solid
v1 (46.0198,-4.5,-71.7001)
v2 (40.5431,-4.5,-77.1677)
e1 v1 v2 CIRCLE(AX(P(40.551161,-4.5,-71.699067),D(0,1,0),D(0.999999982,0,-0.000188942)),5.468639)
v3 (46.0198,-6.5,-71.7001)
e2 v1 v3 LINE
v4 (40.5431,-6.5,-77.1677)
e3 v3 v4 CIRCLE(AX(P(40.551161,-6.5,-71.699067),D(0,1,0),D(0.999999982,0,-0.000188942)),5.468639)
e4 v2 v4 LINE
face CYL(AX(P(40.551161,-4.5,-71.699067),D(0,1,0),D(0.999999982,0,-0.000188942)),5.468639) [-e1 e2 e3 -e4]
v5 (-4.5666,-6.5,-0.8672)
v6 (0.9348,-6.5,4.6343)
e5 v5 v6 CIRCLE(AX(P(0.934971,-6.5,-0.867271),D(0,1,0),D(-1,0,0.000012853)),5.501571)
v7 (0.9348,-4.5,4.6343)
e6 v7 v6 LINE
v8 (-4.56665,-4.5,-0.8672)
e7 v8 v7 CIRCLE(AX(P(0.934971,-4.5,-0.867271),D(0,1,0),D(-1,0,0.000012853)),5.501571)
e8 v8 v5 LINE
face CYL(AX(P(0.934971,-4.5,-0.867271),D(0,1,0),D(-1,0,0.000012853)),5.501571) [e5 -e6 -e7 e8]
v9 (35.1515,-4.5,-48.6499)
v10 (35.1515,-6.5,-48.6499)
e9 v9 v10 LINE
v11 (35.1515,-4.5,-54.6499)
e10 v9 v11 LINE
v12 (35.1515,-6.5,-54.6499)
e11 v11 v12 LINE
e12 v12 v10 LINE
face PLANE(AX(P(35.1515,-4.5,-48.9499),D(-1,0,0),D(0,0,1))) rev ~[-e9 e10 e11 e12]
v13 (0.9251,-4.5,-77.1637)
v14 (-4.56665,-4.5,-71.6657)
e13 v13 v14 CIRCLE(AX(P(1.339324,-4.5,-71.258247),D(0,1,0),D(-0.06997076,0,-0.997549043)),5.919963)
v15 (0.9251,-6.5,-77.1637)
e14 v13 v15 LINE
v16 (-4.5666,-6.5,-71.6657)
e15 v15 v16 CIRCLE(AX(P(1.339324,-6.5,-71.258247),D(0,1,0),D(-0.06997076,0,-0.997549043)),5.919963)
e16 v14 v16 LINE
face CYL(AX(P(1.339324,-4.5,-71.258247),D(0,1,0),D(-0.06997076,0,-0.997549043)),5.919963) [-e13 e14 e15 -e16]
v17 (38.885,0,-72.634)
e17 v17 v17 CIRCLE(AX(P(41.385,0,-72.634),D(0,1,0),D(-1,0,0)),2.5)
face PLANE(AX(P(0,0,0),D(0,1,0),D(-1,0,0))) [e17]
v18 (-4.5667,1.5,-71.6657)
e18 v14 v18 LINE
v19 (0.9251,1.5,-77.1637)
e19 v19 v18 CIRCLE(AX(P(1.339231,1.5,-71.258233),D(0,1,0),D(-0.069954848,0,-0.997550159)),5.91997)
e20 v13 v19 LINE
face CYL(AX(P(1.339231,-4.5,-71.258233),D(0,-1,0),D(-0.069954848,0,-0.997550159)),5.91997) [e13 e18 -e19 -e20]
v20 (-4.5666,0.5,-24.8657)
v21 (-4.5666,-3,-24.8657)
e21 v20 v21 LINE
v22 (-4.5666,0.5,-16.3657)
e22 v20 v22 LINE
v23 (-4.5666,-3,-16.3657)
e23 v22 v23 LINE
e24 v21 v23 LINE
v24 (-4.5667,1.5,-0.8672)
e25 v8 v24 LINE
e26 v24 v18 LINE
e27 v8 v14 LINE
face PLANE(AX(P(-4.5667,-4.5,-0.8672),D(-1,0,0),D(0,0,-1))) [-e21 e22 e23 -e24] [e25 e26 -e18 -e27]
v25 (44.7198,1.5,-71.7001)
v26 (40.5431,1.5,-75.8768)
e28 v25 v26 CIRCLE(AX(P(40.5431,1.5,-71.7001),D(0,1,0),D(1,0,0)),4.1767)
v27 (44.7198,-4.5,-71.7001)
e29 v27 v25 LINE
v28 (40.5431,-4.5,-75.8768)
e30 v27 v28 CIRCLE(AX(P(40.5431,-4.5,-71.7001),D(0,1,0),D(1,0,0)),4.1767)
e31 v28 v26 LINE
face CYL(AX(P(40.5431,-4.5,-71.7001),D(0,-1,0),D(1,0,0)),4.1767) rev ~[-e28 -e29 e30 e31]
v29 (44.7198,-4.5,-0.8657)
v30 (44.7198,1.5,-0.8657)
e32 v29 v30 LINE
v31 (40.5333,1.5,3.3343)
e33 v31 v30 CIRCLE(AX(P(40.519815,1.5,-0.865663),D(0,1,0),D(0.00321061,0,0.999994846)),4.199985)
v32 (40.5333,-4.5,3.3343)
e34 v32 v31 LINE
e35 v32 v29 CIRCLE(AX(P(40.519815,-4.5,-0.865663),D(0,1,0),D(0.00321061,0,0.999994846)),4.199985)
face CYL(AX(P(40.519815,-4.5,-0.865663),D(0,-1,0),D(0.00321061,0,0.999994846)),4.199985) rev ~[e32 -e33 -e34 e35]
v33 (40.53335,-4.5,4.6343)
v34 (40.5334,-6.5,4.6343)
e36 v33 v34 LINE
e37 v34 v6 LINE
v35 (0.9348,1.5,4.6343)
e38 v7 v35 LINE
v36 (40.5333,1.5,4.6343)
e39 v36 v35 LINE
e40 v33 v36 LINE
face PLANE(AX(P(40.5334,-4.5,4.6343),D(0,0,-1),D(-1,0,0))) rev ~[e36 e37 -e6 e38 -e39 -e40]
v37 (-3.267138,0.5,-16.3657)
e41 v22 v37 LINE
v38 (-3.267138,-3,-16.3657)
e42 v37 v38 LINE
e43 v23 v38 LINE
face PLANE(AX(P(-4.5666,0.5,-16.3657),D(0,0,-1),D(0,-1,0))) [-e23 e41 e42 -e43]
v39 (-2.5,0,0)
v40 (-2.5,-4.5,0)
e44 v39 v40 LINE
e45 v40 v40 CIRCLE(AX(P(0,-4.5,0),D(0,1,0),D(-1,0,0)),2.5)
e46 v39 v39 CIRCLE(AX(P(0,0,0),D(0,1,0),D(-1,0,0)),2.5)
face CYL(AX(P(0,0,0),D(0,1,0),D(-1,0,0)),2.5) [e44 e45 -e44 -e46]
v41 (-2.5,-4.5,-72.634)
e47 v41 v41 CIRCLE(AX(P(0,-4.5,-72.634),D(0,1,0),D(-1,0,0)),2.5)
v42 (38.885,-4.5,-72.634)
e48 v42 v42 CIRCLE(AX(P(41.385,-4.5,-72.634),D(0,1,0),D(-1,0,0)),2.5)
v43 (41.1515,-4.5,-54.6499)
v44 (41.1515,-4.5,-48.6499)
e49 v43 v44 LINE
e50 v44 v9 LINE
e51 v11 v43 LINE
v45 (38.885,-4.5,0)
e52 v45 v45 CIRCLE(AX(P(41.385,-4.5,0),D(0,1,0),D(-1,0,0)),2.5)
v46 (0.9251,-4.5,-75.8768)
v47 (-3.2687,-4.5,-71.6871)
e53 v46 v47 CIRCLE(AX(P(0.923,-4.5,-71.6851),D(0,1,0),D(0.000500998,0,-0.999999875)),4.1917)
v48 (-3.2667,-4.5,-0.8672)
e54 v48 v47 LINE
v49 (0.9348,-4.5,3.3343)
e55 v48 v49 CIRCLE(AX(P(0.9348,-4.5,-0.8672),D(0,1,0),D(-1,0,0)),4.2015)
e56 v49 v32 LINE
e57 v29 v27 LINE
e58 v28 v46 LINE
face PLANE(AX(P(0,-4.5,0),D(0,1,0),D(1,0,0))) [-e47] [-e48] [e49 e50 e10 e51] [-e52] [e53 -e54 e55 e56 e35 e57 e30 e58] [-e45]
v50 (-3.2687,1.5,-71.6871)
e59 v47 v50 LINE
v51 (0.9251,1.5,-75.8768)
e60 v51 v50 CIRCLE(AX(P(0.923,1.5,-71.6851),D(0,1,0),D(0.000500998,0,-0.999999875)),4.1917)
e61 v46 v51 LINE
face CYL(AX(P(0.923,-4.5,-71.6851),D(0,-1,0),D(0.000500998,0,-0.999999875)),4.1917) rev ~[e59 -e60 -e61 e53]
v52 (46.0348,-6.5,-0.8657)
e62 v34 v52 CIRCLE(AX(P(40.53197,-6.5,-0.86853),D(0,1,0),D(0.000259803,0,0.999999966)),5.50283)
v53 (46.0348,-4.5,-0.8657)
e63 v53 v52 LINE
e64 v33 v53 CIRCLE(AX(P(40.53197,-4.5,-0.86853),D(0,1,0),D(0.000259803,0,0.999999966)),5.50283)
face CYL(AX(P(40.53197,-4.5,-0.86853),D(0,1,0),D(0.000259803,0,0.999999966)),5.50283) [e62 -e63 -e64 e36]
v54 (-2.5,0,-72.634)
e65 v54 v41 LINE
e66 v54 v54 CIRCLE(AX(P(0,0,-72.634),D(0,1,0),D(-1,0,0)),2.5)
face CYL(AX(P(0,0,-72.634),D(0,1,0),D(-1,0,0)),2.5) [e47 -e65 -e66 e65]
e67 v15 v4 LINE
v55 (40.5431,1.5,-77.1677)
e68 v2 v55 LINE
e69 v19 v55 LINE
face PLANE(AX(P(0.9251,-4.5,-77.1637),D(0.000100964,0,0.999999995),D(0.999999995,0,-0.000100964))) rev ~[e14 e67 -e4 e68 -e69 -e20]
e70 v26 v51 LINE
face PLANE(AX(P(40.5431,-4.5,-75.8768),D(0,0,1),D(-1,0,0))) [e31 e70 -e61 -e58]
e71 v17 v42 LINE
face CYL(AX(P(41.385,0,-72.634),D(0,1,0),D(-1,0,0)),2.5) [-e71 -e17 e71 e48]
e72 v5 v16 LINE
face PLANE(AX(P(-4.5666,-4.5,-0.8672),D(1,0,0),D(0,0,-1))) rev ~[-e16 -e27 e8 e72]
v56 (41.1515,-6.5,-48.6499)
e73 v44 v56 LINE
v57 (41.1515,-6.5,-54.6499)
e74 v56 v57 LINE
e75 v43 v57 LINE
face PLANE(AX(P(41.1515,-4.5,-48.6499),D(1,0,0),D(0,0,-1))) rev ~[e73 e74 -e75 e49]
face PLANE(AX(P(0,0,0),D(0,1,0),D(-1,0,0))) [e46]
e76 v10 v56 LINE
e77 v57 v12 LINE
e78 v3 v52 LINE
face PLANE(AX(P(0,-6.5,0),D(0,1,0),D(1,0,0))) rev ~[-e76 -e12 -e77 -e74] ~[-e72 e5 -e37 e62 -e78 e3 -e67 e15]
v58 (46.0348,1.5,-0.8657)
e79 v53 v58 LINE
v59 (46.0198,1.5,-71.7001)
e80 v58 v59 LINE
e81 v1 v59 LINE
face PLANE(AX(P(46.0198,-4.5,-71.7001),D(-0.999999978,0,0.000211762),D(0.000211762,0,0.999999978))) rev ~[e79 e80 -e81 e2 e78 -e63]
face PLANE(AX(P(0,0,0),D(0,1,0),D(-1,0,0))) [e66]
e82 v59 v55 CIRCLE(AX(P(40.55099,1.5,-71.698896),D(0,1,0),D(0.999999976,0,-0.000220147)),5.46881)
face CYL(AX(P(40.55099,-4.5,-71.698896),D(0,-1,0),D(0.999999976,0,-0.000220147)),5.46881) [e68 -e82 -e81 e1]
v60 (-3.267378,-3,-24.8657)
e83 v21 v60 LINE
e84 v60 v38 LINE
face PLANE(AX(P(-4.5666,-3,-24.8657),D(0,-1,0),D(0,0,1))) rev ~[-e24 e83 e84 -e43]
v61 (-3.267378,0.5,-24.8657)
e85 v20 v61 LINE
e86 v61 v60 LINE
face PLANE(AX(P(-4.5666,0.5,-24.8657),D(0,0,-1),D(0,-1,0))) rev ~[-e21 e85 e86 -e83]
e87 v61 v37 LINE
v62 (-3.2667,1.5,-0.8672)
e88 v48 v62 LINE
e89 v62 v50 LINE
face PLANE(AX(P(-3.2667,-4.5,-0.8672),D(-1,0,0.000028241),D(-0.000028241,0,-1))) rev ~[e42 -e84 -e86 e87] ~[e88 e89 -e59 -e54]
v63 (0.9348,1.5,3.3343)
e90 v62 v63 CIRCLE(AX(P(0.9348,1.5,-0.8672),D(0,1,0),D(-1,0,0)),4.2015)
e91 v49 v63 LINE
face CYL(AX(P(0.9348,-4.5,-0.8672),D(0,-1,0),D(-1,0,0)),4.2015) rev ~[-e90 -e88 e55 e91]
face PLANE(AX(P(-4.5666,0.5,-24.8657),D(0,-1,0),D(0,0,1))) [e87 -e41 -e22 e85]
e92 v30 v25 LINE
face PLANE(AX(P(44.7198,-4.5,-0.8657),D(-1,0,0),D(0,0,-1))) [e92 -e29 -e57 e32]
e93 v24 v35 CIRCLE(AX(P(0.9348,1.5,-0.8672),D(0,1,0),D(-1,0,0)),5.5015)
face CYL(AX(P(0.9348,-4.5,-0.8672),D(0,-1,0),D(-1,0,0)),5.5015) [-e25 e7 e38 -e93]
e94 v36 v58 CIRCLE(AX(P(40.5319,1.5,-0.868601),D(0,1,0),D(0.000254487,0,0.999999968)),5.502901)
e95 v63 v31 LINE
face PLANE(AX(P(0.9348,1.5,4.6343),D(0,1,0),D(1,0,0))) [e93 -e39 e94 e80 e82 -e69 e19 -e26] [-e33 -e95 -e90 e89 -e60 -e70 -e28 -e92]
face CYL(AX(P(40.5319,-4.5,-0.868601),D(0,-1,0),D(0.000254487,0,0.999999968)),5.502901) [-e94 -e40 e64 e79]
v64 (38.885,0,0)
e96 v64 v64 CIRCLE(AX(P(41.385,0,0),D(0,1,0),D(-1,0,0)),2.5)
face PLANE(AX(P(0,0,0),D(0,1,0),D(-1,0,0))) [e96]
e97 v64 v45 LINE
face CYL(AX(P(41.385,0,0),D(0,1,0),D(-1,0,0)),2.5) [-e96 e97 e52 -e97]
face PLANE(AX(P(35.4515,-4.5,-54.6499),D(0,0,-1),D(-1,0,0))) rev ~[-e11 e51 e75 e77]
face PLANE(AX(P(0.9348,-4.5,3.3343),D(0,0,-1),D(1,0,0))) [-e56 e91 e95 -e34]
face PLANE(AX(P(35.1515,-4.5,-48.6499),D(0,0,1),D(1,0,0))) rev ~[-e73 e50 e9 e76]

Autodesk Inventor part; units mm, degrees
ref_plane "YZ Plane" through (0, 0, 0) normal (1, 0, 0) x (0, 1, 0)
ref_plane "XZ Plane" through (0, 0, 0) normal (0, 1, 0) x (-1, 0, 0)
ref_plane "XY Plane" through (0, 0, 0) normal (0, 0, 1) x (1, 0, 0)
sketch "Эскиз1" plane through (0, 0, 0) normal (0, 1, 0) x (-1, 0, 0)
  circle A0 centre (0, 0) radius 2.5
  circle A1 centre (0, -72.634) radius 2.5
  circle A2 centre (-41.385, -72.634) radius 2.5
  circle A3 centre (-41.385, 0) radius 2.5
  dimension "d1" = 5
  dimension "d3" = 5
  dimension "d5" = 5
  dimension "d7" = 5
extrude "Выдавливание1" add sketch "Эскиз1" against normal blind 4.5
sketch "Эскиз3" plane through (0, 0, 0) normal (0, 1, 0) x (1, 0, 0)
  line L0 (-4.5666, 0.8672) -> (-4.5666, 71.6657)
  line L1 (0.9251, 77.1637) -> (40.5431, 77.1677)
  line L2 (46.0198, 71.7001) -> (46.0348, 0.8657)
  line L3 (40.5334, -4.6343) -> (0.9348, -4.6343)
  arc A0 (-4.5666, 0.8672) -> (0.9348, -4.6343) centre (0.9348, 0.8672) ccw
  arc A1 (46.0198, 71.7001) -> (40.5431, 77.1677) centre (40.551, 71.699) ccw
  arc A2 (40.5334, -4.6343) -> (46.0348, 0.8657) centre (40.5319, 0.8687) ccw
  line L4 (35.1515, 48.9499) -> (35.1515, 54.3499)
  line L5 (35.1515, 54.6499) -> (35.1515, 48.6499)
  line L6 (35.4515, 54.6499) -> (40.8515, 54.6499)
  line L7 (41.1515, 54.6499) -> (35.1515, 54.6499)
  line L8 (40.8515, 48.6499) -> (35.4515, 48.6499)
  line L9 (41.1515, 54.3499) -> (41.1515, 48.9499)
  line L10 (41.1515, 48.6499) -> (41.1515, 54.6499)
  line L11 (35.1515, 48.6499) -> (41.1515, 48.6499)
  arc A3 (0.9251, 77.1637) -> (-4.5666, 71.6657) centre (1.3393, 71.2583) ccw
extrude "Выдавливание2" add sketch "Эскиз3" against normal blind 2 from surface at -4.5
sketch "Эскиз4" plane through (0.9348, -4.5, 4.6343) normal (0, 1, 0) x (1, 0, 0)
  line L0 (-5.5015, 5.5015) -> (-5.5015, 76.3) projected
  arc A0 (-4.2015, 5.5015) -> (0, 1.3) centre (0, 5.5015) ccw
  line L1 (45.085, 76.3344) -> (45.1, 5.5) projected
  line L2 (-0.0097, 81.798) -> (39.6083, 81.802) projected
  arc A1 (-0.0097, 80.5111) -> (-4.2035, 76.3214) centre (-0.0118, 76.3194) ccw
  arc A2 (43.785, 76.3344) -> (39.6083, 80.5111) centre (39.6083, 76.3344) ccw
  arc A3 (39.5985, 1.3) -> (43.785, 5.5) centre (39.585, 5.5) ccw
  line L3 (0, 1.3) -> (39.5985, 1.3)
  line L4 (43.785, 5.5) -> (43.785, 76.3344)
  line L5 (39.6083, 80.5111) -> (-0.0097, 80.5111)
  arc A4 (-5.5015, 5.5015) -> (0, 0) centre (0, 5.5015) ccw projected
  arc A5 (-0.0097, 81.798) -> (-5.5015, 76.3) centre (0.4044, 75.8926) ccw projected
  line L6 (-0.0097, 81.798) -> (39.6083, 81.802) projected
  arc A6 (45.085, 76.3344) -> (39.6083, 81.802) centre (39.6162, 76.3332) ccw projected
  arc A7 (39.5985, 0) -> (45.1, 5.5) centre (39.5971, 5.5029) ccw projected
  line L7 (39.5985, 0) -> (0, 0) projected
  arc A8 (-5.5015, 5.5015) -> (0, 0) centre (0, 5.5015) ccw
  arc A9 (-0.0097, 81.798) -> (-5.5015, 76.3) centre (0.4044, 75.8926) ccw
  arc A10 (45.085, 76.3344) -> (39.6083, 81.802) centre (39.6162, 76.3332) ccw projected
  arc A11 (45.085, 76.3344) -> (39.6083, 81.802) centre (39.6088, 76.3258) ccw
  arc A12 (39.5985, 0) -> (45.1, 5.5) centre (39.5971, 5.5029) ccw
  line L8 (-5.5015, 5.5015) -> (-5.5015, 76.3)
  line L9 (-0.0097, 81.798) -> (39.6083, 81.802)
  line L10 (45.085, 76.3344) -> (45.1, 5.5082)
  line L11 (39.5985, 0) -> (0, 0)
  line L12 (-4.2015, 5.5015) -> (-4.2035, 76.3214)
  circle A13 centre (40.4502, 77.2683) radius 1.5 projected
  point P0 (-0.9348, 4.6343)
extrude "Выдавливание3" add sketch "Эскиз4" along normal blind 6 contours L0 A5 L2 A11 L1 A7 L7 A4 | A6 A11
sketch "Эскиз5" plane through (-4.5666, -6.5, -71.6657) normal (-1, 0, 0) x (0, 0, 1)
  line L0 (-5.498, 0) -> (0, 0) projected
  line L1 (55.3, 7) -> (55.3, 3.5)
  line L2 (-0.0344, 8) -> (70.8, 8) projected
  line L3 (76.3, 0) -> (76.3, 8) projected
  line L4 (46.8, 7) -> (46.8, 3.5)
  line L5 (46.8, 3.5) -> (55.3, 3.5)
  line L6 (-0.0344, 0) -> (70.8, 0) projected
  line L7 (46.8, 7) -> (55.3, 7)
  line L8 (74.1657, 6.5) -> (69.1657, 6.5) projected
  point P0 (71.6657, 6.5)
  point P1 (57.3, 6.5)
  dimension "d24" = 21
  dimension "d25" = 8.5
  dimension "d26" = 3.5
extrude "Выдавливание4" cut sketch "Эскиз5" against normal blind 6
properties part number "Основание" material "Каучук, силиконовый"
